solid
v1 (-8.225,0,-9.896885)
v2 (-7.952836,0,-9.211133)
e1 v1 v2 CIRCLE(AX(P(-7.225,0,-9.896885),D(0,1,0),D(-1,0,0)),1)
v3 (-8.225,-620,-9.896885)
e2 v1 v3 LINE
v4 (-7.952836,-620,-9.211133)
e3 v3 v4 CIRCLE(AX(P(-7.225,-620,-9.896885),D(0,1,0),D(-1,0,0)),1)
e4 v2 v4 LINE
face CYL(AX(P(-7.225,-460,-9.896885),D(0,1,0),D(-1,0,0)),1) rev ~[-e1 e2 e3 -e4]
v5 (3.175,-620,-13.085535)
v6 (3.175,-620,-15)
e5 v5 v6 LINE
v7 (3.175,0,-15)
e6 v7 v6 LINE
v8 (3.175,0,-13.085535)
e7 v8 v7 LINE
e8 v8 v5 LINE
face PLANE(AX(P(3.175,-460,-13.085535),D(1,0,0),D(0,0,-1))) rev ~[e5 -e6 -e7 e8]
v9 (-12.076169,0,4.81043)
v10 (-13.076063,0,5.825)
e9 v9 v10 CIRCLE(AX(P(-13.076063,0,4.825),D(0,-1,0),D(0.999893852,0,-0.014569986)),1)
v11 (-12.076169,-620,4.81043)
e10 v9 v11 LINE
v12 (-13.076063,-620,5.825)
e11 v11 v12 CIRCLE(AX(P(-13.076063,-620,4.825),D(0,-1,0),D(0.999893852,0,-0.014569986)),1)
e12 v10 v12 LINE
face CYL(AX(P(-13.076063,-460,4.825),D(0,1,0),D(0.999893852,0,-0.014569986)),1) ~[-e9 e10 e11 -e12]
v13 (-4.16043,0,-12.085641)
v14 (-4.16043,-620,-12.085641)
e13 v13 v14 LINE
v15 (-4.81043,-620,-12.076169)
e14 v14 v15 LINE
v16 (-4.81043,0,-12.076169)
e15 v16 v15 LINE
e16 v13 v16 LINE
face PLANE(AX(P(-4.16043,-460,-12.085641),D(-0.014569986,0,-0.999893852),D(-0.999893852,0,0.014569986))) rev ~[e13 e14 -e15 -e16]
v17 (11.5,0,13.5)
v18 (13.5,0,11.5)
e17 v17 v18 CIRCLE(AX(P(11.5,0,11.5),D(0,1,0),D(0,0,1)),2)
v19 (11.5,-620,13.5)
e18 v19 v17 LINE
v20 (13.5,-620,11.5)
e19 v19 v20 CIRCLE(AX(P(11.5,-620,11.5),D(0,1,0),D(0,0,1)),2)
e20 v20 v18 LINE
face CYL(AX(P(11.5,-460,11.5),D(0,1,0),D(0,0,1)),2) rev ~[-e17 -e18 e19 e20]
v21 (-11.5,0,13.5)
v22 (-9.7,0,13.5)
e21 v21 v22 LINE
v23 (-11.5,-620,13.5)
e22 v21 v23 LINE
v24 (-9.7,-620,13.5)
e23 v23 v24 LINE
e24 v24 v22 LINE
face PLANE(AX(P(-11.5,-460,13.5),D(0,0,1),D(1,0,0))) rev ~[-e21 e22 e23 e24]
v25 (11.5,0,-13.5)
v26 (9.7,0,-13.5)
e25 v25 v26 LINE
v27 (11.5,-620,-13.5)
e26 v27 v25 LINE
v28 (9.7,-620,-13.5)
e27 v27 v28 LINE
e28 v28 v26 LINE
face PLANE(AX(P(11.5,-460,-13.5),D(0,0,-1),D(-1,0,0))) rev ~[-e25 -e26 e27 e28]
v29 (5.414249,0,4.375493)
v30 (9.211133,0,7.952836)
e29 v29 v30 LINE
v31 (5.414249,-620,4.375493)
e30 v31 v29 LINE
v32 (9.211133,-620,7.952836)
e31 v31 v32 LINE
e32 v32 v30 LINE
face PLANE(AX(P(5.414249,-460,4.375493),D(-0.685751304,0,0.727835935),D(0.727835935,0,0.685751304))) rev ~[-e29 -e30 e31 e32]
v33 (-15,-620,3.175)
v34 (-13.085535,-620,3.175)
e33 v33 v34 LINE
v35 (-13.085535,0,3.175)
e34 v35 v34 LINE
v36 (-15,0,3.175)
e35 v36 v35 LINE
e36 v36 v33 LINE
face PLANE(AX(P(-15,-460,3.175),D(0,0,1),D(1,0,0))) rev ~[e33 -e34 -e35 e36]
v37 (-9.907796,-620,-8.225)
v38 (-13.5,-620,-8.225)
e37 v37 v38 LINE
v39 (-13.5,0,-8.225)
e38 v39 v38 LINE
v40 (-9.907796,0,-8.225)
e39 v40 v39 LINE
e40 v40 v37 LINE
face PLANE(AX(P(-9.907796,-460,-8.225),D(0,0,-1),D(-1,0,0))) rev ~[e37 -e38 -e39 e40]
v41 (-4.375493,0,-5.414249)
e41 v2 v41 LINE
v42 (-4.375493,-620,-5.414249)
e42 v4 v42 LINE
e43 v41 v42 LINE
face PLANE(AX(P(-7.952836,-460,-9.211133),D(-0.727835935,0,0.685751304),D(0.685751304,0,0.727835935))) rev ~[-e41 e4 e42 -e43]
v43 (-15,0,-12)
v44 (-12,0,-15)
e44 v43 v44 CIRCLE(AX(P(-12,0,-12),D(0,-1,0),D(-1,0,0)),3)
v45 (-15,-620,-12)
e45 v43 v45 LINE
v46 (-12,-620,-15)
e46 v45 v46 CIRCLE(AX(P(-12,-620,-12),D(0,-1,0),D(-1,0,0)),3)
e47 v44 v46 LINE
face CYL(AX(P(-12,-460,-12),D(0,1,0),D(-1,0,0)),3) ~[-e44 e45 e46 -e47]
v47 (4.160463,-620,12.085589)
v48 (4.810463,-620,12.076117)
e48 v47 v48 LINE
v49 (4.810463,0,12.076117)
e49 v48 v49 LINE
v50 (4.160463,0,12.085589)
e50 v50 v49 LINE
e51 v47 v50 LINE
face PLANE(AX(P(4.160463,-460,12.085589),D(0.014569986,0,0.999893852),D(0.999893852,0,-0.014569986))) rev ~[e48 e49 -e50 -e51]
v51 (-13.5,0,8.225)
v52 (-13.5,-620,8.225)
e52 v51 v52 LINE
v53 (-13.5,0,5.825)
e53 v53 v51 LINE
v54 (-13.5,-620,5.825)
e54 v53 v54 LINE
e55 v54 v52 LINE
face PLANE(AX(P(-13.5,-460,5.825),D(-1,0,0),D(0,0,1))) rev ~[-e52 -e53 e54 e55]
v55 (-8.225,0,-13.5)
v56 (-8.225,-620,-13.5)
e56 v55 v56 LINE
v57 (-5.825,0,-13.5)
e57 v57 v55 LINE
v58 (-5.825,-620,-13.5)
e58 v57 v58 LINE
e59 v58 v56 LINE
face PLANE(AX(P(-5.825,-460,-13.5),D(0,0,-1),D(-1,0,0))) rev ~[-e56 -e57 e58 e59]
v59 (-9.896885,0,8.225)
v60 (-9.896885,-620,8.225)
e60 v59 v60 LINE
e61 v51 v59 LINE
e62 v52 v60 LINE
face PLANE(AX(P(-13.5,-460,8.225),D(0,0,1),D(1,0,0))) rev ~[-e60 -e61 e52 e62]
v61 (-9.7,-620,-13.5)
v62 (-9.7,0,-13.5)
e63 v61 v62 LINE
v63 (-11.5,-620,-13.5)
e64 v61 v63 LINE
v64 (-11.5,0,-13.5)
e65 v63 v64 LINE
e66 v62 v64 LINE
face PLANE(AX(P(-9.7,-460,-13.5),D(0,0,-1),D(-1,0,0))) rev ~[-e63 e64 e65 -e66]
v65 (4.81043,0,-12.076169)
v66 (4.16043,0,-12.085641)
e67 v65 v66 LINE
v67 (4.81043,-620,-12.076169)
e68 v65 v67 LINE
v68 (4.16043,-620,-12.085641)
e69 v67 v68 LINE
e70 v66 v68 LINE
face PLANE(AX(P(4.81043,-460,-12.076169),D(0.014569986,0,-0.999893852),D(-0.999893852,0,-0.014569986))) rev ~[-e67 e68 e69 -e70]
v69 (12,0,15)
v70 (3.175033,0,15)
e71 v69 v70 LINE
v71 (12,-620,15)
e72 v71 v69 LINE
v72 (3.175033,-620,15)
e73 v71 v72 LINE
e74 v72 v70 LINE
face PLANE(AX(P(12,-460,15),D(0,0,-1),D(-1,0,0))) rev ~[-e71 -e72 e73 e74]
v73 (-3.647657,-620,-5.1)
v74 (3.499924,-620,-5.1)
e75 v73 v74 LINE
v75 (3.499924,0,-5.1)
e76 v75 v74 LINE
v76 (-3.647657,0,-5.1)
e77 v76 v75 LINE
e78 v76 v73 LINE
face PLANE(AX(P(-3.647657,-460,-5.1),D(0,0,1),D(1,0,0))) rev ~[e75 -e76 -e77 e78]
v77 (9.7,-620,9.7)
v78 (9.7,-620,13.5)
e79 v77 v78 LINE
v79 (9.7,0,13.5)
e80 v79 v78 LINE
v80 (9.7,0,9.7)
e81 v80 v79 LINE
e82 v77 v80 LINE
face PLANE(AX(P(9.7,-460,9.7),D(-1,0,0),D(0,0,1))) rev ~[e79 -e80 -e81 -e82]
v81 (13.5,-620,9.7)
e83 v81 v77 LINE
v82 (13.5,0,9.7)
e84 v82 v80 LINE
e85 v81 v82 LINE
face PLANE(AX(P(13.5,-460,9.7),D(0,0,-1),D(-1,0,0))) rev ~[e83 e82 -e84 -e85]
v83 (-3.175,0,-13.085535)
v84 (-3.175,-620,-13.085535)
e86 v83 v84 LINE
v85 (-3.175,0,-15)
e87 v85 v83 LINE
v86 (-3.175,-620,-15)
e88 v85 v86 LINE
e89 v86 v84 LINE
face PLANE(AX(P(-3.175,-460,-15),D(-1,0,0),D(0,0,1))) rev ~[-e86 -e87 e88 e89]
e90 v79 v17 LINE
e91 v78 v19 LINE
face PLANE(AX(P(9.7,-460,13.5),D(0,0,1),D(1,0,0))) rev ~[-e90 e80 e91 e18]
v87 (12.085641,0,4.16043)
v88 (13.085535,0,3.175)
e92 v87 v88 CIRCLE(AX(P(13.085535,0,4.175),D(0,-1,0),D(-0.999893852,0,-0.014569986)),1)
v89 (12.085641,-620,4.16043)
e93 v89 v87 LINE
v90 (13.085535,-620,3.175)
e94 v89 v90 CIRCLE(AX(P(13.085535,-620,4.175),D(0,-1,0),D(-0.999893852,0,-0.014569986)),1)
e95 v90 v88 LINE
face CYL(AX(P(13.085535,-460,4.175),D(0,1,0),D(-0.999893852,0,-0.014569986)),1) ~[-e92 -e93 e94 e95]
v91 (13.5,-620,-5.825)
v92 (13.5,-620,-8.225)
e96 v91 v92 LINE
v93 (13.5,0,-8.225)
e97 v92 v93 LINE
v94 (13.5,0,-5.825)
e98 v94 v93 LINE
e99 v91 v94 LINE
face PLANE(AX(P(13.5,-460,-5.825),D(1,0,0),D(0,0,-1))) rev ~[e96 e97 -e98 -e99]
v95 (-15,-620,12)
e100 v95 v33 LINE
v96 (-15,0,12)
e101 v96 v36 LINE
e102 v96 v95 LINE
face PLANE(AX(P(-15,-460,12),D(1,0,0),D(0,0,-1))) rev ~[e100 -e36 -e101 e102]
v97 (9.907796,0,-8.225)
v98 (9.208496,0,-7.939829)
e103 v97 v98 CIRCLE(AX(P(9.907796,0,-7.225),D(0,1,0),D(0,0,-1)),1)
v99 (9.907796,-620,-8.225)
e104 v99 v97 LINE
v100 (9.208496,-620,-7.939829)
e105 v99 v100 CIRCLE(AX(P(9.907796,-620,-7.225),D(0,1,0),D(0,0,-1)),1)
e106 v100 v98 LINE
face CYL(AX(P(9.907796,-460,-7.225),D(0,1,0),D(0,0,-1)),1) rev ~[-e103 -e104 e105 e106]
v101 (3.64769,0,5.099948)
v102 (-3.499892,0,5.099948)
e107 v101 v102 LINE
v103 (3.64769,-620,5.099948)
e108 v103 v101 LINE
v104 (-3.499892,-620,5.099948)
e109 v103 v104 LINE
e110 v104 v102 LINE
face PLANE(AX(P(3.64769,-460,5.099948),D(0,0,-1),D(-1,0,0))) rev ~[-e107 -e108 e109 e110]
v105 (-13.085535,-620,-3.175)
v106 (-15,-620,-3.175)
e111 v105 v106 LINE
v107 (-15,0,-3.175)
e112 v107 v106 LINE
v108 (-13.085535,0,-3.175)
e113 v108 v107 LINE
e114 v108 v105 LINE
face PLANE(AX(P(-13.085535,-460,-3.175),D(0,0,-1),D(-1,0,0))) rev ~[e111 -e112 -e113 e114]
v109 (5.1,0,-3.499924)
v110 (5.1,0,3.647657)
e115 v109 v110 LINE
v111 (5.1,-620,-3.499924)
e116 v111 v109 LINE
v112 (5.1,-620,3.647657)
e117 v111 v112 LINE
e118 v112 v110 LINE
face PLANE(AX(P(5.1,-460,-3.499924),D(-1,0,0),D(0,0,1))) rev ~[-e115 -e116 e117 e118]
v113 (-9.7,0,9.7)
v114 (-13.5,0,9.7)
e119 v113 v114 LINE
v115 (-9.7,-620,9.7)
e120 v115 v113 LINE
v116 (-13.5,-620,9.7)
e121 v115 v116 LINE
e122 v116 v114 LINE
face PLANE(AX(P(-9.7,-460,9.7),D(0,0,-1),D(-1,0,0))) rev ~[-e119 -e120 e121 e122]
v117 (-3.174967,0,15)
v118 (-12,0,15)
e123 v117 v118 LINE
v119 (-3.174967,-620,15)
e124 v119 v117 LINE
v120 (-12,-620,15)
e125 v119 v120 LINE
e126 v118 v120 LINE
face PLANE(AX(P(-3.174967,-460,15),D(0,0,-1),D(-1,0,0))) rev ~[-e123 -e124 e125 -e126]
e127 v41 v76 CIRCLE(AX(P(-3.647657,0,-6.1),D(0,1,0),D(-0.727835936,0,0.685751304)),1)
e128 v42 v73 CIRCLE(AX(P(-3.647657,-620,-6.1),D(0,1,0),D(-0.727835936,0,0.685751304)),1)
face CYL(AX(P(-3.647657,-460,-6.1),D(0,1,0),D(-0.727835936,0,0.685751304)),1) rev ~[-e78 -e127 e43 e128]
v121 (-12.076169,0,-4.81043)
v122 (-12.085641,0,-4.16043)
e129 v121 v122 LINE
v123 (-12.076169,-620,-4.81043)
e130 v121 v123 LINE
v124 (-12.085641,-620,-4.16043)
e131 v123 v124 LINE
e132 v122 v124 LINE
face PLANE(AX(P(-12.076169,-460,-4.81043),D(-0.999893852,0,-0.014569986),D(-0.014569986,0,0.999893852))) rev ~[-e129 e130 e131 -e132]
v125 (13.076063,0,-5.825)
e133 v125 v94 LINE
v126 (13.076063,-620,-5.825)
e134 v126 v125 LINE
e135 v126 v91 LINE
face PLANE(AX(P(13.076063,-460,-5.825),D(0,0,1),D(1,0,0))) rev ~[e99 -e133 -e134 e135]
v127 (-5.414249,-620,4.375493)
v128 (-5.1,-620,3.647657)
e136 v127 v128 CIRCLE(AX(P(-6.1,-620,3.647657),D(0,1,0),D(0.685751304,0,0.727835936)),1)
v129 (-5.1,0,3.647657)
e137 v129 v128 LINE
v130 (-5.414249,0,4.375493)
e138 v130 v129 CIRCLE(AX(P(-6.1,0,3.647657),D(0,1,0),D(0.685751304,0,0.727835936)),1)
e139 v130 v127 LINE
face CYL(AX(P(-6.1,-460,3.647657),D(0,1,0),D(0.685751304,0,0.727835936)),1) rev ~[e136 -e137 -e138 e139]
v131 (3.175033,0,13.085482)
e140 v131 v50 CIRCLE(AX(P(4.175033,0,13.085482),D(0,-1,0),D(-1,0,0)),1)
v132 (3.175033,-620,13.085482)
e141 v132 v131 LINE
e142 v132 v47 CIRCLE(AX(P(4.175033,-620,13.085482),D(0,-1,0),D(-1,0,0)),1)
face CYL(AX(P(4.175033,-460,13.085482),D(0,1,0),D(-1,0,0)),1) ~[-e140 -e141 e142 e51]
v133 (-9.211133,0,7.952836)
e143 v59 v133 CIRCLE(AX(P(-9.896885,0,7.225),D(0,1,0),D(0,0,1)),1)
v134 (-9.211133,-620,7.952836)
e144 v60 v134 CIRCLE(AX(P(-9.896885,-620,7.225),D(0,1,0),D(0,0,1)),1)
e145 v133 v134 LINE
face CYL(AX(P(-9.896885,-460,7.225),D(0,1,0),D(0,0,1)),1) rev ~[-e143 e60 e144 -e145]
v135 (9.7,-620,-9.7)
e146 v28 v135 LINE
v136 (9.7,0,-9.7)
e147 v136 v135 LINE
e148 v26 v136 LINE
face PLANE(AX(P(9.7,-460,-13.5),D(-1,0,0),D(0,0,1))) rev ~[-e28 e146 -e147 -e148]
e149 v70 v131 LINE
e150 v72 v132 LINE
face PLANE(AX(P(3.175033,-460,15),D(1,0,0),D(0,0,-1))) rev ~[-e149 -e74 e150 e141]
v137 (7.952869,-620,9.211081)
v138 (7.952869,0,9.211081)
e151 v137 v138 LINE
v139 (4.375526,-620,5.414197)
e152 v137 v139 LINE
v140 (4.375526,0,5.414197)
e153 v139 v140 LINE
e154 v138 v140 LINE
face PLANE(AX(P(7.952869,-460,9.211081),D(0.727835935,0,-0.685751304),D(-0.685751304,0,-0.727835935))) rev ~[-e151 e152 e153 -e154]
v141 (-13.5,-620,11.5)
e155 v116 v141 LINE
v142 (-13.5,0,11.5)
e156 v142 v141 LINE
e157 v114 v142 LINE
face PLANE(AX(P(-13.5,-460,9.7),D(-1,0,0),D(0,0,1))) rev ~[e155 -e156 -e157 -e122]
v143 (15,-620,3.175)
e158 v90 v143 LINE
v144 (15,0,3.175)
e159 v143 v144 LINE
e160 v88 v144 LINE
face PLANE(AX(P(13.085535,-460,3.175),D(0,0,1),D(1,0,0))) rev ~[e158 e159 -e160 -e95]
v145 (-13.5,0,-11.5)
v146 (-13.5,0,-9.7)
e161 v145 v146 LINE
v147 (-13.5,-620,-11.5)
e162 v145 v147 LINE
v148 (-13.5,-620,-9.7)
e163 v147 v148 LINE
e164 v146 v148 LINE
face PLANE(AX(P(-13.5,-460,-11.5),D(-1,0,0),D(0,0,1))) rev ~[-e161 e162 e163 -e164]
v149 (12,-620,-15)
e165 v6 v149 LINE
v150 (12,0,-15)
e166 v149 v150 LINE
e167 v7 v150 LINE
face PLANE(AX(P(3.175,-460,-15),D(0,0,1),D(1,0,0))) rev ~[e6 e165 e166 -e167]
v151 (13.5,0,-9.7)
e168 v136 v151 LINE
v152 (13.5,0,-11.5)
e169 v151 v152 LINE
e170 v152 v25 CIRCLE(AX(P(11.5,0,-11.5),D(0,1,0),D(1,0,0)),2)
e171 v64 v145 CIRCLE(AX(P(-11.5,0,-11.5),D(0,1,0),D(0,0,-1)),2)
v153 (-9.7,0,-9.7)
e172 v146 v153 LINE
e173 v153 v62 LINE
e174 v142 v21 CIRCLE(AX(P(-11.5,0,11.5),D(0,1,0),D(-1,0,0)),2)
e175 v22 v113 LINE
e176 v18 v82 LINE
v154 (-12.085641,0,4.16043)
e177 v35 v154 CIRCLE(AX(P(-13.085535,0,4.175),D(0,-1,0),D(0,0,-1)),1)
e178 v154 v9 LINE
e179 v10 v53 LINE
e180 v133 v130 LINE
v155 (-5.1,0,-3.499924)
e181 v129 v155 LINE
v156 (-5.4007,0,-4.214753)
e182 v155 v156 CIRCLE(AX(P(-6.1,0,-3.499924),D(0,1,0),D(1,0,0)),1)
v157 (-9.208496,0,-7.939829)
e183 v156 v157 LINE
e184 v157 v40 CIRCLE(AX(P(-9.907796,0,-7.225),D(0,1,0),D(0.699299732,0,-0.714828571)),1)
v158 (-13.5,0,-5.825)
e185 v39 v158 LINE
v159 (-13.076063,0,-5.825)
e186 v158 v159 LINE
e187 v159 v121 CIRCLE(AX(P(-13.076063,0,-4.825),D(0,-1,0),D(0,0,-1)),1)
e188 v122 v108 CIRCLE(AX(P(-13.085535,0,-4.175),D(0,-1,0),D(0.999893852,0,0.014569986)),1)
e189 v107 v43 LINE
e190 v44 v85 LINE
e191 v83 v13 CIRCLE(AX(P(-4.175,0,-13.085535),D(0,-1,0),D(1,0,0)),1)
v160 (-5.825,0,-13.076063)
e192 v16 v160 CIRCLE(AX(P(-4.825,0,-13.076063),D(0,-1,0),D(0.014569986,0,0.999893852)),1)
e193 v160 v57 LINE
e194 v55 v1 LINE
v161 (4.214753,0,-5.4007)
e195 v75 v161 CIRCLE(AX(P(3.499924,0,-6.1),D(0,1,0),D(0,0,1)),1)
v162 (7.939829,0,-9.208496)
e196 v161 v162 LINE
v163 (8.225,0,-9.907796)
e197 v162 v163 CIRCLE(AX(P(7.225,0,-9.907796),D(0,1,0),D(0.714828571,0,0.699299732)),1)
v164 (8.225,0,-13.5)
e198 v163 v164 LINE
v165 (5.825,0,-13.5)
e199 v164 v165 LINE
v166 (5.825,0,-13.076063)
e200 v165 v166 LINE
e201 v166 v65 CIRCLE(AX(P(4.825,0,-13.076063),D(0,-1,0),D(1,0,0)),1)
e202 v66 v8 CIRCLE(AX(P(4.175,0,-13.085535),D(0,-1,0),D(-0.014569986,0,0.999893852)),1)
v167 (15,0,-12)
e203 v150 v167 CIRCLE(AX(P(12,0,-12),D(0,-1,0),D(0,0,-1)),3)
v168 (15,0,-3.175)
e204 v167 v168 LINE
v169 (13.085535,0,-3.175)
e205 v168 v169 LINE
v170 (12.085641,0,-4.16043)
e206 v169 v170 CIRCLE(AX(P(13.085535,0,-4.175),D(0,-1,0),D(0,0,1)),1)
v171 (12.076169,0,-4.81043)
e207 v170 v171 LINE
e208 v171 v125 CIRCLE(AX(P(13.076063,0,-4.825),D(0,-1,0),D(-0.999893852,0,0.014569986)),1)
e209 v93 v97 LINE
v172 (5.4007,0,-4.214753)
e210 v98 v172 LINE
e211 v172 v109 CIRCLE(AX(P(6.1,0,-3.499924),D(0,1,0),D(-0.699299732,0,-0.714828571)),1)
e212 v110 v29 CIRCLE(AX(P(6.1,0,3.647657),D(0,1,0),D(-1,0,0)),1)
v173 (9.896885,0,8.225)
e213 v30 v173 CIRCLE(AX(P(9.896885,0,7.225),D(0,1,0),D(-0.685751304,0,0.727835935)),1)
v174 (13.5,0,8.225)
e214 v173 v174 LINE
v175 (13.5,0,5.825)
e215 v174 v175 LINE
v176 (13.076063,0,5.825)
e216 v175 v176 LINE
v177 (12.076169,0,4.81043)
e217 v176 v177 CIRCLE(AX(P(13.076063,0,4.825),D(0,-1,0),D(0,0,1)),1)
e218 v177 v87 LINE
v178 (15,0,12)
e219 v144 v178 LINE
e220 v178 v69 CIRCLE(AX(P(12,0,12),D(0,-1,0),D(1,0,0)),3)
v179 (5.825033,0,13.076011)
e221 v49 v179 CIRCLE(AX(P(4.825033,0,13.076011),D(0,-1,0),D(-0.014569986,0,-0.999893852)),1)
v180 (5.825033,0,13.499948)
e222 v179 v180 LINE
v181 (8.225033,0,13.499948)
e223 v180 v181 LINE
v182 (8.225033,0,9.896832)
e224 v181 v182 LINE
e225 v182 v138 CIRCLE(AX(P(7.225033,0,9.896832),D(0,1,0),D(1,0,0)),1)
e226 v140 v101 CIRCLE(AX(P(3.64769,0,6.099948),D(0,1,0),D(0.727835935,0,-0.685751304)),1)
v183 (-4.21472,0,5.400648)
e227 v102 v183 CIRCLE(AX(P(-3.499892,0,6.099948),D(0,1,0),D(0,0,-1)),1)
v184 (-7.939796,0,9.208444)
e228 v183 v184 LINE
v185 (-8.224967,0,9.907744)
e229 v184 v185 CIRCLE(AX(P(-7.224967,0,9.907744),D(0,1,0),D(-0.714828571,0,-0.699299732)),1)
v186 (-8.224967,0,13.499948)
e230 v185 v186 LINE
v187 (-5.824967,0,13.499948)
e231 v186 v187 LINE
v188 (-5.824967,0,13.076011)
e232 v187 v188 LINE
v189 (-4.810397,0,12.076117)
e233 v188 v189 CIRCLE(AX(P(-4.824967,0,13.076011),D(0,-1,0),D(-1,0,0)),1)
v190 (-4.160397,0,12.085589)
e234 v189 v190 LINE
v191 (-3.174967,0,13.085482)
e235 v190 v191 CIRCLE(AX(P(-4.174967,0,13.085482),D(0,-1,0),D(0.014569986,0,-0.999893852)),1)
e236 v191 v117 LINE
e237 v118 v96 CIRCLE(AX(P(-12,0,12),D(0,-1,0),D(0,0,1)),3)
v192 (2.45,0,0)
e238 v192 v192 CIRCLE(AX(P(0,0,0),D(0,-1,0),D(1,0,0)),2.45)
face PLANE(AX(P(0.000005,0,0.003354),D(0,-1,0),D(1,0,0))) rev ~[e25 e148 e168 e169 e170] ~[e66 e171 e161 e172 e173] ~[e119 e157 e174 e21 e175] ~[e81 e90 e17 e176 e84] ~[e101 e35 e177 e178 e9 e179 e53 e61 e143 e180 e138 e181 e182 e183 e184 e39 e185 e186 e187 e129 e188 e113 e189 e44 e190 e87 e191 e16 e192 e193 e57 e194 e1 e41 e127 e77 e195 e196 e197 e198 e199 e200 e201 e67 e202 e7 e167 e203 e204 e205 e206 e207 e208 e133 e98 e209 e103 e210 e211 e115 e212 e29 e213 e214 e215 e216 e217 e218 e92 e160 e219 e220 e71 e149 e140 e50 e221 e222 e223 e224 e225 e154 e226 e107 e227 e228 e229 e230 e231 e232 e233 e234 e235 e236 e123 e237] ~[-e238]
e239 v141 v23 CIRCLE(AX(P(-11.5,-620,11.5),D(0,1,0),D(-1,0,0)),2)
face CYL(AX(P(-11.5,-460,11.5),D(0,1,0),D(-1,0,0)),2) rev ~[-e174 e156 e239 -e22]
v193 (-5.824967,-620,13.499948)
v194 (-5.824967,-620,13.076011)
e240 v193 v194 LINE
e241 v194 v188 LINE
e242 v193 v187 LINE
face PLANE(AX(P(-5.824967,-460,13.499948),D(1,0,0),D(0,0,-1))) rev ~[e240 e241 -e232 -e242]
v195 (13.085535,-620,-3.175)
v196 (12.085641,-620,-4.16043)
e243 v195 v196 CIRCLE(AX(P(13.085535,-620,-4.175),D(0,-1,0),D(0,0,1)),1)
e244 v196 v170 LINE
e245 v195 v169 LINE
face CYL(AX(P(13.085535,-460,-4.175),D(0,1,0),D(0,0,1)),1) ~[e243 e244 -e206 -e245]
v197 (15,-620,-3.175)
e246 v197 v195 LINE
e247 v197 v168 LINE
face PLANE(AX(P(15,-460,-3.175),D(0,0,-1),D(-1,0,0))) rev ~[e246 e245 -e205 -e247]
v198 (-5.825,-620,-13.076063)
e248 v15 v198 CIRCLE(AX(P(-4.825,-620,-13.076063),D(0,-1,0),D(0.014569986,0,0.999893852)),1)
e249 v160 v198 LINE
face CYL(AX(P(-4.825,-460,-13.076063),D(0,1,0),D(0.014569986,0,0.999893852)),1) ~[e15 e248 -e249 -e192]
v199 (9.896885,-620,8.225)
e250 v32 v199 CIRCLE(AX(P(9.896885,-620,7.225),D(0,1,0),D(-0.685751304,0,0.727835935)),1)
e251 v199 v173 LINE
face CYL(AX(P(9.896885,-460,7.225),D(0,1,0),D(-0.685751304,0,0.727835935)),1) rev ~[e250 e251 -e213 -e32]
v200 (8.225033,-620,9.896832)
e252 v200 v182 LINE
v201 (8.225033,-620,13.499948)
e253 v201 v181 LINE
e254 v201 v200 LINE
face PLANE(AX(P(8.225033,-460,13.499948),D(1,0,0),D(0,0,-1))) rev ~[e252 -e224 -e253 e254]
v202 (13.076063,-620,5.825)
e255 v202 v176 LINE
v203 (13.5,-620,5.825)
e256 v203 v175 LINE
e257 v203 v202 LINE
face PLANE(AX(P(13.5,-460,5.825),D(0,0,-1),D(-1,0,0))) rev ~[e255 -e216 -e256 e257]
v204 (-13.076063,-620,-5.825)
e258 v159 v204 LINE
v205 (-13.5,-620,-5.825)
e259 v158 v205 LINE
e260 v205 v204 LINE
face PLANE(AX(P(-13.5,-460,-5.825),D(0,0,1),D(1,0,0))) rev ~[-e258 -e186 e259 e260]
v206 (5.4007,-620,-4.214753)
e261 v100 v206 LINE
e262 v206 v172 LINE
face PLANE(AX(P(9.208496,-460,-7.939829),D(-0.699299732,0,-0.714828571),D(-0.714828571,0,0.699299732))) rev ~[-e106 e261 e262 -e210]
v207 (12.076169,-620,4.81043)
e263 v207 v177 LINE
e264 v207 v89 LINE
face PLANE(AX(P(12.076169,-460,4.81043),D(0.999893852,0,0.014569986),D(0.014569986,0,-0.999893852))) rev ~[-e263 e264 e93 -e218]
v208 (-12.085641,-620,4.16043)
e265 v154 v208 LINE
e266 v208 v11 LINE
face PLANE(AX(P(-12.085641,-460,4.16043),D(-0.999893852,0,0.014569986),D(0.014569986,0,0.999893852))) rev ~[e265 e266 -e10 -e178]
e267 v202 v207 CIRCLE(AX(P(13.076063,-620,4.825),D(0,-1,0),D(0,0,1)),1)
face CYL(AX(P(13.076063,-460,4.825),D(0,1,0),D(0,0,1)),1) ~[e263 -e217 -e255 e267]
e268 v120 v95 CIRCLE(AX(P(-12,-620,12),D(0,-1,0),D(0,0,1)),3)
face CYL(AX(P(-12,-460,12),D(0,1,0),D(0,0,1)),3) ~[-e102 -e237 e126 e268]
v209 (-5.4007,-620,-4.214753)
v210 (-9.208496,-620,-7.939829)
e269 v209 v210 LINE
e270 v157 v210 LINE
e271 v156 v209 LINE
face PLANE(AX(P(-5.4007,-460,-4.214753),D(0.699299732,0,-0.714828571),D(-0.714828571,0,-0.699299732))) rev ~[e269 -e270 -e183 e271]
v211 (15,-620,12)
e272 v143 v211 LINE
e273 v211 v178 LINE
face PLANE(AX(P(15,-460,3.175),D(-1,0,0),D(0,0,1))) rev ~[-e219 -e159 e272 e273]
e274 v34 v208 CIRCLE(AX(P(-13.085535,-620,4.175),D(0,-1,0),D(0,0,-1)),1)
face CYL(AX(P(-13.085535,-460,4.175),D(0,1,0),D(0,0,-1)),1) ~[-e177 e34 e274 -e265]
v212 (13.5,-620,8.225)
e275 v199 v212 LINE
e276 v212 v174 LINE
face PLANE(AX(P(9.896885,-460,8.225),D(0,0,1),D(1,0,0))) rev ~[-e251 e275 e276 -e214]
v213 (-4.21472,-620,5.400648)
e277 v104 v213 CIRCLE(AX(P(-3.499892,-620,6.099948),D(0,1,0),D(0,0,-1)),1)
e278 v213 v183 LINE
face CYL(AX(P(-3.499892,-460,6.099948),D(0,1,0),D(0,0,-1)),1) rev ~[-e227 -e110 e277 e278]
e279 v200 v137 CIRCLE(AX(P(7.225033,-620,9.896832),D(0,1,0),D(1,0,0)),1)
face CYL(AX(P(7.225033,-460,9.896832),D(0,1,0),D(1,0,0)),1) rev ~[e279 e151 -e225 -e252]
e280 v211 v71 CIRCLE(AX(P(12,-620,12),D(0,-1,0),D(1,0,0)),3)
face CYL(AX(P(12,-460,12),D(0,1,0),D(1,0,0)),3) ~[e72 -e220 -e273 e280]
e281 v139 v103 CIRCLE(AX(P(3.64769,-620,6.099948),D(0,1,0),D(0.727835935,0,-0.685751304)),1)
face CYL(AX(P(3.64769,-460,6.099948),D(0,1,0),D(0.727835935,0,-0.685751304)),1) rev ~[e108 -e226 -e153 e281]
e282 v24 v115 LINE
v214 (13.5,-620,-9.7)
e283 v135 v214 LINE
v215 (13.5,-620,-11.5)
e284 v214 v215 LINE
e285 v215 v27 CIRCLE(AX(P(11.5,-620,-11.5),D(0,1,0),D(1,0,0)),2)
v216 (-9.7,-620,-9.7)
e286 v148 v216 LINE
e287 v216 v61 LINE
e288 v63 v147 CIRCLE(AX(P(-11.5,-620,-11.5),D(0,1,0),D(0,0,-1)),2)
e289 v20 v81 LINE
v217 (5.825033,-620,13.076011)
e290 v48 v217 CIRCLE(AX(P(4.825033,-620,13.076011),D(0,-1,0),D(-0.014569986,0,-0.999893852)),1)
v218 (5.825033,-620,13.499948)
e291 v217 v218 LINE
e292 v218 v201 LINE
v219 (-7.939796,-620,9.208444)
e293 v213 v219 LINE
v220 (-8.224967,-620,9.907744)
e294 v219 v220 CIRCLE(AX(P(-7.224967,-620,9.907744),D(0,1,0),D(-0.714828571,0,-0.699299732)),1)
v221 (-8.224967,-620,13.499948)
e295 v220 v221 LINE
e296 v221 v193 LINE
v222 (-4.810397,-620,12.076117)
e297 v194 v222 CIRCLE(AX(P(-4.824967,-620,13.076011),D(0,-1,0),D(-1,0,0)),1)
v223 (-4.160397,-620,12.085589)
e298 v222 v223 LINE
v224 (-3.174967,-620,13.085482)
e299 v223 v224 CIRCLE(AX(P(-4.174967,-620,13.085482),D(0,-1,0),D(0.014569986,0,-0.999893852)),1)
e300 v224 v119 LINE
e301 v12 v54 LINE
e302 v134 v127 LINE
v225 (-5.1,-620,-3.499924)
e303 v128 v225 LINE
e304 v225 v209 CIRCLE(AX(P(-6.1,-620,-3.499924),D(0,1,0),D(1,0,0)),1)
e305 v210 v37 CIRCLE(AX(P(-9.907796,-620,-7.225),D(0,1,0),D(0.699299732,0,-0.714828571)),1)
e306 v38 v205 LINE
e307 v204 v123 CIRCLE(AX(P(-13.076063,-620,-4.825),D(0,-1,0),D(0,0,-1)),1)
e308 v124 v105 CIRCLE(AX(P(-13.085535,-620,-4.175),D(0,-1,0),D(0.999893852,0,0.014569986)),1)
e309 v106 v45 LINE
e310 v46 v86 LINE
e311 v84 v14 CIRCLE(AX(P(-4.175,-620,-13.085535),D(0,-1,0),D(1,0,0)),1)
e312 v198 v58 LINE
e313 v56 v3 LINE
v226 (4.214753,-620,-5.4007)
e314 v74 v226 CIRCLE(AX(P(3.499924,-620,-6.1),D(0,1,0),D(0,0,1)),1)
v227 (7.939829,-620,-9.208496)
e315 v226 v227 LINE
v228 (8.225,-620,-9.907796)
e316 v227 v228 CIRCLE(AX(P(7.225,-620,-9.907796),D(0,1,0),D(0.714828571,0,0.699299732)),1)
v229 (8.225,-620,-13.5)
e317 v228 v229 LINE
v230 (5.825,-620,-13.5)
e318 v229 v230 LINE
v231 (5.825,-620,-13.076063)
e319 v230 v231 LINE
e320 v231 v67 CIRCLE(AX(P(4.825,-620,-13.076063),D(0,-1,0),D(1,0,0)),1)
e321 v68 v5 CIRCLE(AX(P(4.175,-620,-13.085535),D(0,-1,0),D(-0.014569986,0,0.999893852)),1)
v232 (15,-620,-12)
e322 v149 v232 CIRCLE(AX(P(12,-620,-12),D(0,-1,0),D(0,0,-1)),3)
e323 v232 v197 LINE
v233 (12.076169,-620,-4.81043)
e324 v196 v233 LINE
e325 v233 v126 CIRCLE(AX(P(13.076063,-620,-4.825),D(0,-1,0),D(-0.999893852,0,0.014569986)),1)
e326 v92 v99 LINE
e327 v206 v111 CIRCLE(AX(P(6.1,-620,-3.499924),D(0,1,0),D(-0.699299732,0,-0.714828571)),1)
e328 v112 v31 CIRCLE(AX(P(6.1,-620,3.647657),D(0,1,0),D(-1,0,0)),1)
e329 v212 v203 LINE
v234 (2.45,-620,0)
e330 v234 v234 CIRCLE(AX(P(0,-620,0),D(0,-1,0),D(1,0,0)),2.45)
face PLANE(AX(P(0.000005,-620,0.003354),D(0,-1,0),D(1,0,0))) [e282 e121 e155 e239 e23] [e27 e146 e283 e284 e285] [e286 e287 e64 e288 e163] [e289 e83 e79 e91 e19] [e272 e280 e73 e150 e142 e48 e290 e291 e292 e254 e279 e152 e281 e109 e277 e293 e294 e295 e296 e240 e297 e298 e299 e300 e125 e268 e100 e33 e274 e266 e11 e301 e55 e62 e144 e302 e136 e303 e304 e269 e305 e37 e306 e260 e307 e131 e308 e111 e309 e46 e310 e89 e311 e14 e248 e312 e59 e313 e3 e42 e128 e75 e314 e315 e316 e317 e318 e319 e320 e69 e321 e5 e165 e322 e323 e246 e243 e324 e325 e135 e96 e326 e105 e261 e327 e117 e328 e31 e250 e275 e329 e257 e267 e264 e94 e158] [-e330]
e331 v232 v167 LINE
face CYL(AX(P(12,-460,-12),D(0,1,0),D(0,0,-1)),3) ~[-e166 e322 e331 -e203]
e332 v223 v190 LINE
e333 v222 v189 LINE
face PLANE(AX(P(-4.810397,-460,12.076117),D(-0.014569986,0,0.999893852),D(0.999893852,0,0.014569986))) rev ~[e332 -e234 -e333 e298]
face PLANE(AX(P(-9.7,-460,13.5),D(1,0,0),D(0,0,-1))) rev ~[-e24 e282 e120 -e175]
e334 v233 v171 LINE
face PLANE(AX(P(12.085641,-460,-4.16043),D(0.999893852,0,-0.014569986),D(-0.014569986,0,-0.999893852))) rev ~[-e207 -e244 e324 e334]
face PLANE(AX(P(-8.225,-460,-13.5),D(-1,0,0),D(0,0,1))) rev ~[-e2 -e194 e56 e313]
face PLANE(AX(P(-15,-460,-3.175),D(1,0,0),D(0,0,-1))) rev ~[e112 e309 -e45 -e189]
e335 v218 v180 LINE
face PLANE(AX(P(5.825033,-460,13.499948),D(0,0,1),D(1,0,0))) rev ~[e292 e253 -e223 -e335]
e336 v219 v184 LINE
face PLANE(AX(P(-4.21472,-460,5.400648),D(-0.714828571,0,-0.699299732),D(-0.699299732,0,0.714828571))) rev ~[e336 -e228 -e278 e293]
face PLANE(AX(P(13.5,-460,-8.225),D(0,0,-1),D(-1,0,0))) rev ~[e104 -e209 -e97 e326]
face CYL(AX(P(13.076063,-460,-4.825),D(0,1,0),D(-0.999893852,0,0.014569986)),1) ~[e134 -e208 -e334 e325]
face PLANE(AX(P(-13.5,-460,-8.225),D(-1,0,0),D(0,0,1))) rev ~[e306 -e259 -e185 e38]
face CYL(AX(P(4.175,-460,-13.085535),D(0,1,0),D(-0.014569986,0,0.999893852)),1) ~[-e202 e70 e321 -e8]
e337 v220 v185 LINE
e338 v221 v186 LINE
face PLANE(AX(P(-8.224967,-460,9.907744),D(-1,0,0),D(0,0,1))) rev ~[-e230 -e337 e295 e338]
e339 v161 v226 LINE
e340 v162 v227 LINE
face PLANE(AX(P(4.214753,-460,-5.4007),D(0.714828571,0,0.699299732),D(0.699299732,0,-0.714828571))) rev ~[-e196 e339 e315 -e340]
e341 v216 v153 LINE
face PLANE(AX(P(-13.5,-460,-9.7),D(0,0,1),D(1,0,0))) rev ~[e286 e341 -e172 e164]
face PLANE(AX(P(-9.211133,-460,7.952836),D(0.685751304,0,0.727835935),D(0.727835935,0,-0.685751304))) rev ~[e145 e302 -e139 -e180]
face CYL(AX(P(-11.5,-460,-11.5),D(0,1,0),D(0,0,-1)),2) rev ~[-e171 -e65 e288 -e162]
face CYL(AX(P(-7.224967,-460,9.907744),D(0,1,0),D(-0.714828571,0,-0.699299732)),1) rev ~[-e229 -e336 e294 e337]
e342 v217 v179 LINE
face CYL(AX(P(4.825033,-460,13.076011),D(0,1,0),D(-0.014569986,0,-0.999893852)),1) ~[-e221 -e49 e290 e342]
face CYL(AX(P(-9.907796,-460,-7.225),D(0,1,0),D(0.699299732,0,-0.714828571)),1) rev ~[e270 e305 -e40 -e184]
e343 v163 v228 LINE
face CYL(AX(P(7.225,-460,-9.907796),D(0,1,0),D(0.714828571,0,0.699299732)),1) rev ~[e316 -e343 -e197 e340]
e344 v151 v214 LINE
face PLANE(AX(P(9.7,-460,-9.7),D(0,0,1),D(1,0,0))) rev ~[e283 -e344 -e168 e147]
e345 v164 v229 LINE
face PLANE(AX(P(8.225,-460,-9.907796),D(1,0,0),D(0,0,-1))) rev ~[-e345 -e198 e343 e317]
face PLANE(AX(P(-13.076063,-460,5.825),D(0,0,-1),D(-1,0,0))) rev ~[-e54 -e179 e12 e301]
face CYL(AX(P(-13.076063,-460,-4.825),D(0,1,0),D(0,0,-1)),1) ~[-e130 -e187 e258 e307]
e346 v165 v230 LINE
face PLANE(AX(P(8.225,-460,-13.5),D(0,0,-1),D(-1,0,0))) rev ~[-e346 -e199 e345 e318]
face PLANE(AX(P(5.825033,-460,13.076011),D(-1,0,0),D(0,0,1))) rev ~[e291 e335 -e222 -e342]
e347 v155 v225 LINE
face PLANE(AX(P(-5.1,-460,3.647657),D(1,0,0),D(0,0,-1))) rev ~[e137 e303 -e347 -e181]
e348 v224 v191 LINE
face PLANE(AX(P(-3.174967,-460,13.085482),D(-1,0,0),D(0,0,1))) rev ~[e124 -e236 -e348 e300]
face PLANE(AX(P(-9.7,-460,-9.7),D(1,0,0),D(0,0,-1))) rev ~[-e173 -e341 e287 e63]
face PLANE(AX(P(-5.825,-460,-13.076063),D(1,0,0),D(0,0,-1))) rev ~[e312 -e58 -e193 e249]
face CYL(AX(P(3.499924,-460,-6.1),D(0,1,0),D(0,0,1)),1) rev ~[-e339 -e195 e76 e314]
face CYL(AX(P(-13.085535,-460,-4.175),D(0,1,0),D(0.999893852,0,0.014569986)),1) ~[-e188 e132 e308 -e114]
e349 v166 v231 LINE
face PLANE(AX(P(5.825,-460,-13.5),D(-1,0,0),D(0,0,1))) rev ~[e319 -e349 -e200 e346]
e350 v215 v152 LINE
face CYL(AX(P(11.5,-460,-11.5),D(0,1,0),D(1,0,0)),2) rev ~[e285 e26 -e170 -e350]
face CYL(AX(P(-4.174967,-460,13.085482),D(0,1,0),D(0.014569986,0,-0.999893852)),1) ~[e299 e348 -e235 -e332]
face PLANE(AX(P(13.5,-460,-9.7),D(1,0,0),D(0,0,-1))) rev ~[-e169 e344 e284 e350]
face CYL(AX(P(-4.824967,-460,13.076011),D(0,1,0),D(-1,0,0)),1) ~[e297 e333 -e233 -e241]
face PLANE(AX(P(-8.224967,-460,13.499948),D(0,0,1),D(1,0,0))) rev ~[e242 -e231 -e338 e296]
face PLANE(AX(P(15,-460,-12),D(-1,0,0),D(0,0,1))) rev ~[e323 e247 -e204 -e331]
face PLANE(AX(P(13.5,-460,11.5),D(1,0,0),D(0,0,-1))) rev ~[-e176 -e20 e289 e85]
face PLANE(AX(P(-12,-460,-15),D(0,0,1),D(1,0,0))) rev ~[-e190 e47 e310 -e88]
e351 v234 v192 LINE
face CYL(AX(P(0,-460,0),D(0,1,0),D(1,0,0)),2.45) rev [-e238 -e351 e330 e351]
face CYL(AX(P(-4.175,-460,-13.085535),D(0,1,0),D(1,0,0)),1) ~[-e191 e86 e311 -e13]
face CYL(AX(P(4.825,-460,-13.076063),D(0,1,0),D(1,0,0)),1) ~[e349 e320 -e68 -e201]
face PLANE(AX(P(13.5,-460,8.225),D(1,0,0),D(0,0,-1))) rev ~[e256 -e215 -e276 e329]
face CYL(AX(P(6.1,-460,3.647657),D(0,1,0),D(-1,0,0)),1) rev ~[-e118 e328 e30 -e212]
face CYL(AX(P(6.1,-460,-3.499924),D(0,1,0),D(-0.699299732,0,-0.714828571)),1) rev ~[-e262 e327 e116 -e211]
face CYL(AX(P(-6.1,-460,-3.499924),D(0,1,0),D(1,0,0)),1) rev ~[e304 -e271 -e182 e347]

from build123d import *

# Parameters (mm, degrees)
F0_R     = 2.45
F1_DEPTH = 460
F2_DEPTH = 160


# Not quite as in the source:
# - ends of sketch curves that miss each other by under 0.0002 mm in the source are joined


with BuildPart() as f1:
    # F0 (on Front) → F1 (new body)
    with BuildSketch(Plane.XZ):
        with BuildLine():
            Line((-3.1749674082, 15), (-12, 15))
            ThreePointArc((-12, 15), (-14.1213203436, 14.1213203436), (-15, 12))
            Line((-15, 12), (-15, 3.175))
            Line((-15, 3.175), (-13.0855346263, 3.175))
            ThreePointArc((-13.0855346263, 3.175), (-12.3835980145, 3.4627605788), (-12.0856407741, 4.1604300138))
            Line((-12.0856407741, 4.1604300138), (-12.0761692778, 4.8104300138))
            ThreePointArc((-12.0761692778, 4.8104300138), (-12.3638237087, 5.5269366118), (-13.0760631299, 5.825))
            Line((-13.0760631299, 5.825), (-13.5, 5.825))
            Line((-13.5, 5.825), (-13.5, 8.225))
            Line((-13.5, 8.225), (-9.8968845016, 8.225))
            ThreePointArc((-9.8968845016, 8.225), (-9.5279915195, 8.1544718757), (-9.2111331975, 7.9528359354))
            Line((-9.2111331975, 7.9528359354), (-5.4142486959, 4.3754933338))
            ThreePointArc((-5.4142486959, 4.3754933338), (-5.1819174045, 4.0440465354), (-5.1, 3.6476573984))
            Line((-5.1, 3.6476573984), (-5.1, -3.4999243287))
            ThreePointArc((-5.1, -3.4999243287), (-5.1782354607, -3.8876744211), (-5.4007002683, -4.2147528992))
            Line((-5.4007002683, -4.2147528992), (-9.2084959767, -7.9398285705))
            ThreePointArc((-9.2084959767, -7.9398285705), (-9.5301904718, -8.1509666761), (-9.9077957084, -8.225))
            Line((-9.9077957084, -8.225), (-13.5, -8.225))
            Line((-13.5, -8.225), (-13.5, -5.825))
            Line((-13.5, -5.825), (-13.0760631299, -5.825))
            ThreePointArc((-13.0760631299, -5.825), (-12.3638237087, -5.5269366118), (-12.0761692778, -4.8104300138))
            Line((-12.0761692778, -4.8104300138), (-12.0856407741, -4.1604300138))
            ThreePointArc((-12.0856407741, -4.1604300138), (-12.3835980145, -3.4627605788), (-13.0855346263, -3.175))
            Line((-13.0855346263, -3.175), (-15, -3.175))
            Line((-15, -3.175), (-15, -12))
            ThreePointArc((-15, -12), (-14.1213203436, -14.1213203436), (-12, -15))
            Line((-12, -15), (-3.175, -15))
            Line((-3.175, -15), (-3.175, -13.0855346263))
            ThreePointArc((-3.175, -13.0855346263), (-3.4627605788, -12.3835980145), (-4.1604300138, -12.0856407741))
            Line((-4.1604300138, -12.0856407741), (-4.8104300138, -12.0761692778))
            ThreePointArc((-4.8104300138, -12.0761692778), (-5.5269366118, -12.3638237087), (-5.825, -13.0760631299))
            Line((-5.825, -13.0760631299), (-5.825, -13.5))
            Line((-5.825, -13.5), (-8.225, -13.5))
            Line((-8.225, -13.5), (-8.225, -9.8968845016))
            ThreePointArc((-8.225, -9.8968845016), (-8.1544718757, -9.5279915195), (-7.9528359354, -9.2111331975))
            Line((-7.9528359354, -9.2111331975), (-4.3754933338, -5.4142486959))
            ThreePointArc((-4.3754933338, -5.4142486959), (-4.0440465354, -5.1819174045), (-3.6476573984, -5.1))
            Line((-3.6476573984, -5.1), (3.4999243287, -5.1))
            ThreePointArc((3.4999243287, -5.1), (3.8876744211, -5.1782354607), (4.2147528992, -5.4007002683))
            Line((4.2147528992, -5.4007002683), (7.9398285705, -9.2084959767))
            ThreePointArc((7.9398285705, -9.2084959767), (8.1509666761, -9.5301904718), (8.225, -9.9077957084))
            Line((8.225, -9.9077957084), (8.225, -13.5))
            Line((8.225, -13.5), (5.825, -13.5))
            Line((5.825, -13.5), (5.825, -13.0760631299))
            ThreePointArc((5.825, -13.0760631299), (5.5269366118, -12.3638237087), (4.8104300138, -12.0761692778))
            Line((4.8104300138, -12.0761692778), (4.1604300138, -12.0856407741))
            ThreePointArc((4.1604300138, -12.0856407741), (3.4627605788, -12.3835980145), (3.175, -13.0855346263))
            Line((3.175, -13.0855346263), (3.175, -15))
            Line((3.175, -15), (12, -15))
            ThreePointArc((12, -15), (14.1213203436, -14.1213203436), (15, -12))
            Line((15, -12), (15, -3.175))
            Line((15, -3.175), (13.0855346263, -3.175))
            ThreePointArc((13.0855346263, -3.175), (12.3835980145, -3.4627605788), (12.0856407741, -4.1604300138))
            Line((12.0856407741, -4.1604300138), (12.0761692778, -4.8104300138))
            ThreePointArc((12.0761692778, -4.8104300138), (12.3638237087, -5.5269366118), (13.0760631299, -5.825))
            Line((13.0760631299, -5.825), (13.5, -5.825))
            Line((13.5, -5.825), (13.5, -8.225))
            Line((13.5, -8.225), (9.9077957084, -8.225))
            ThreePointArc((9.9077957084, -8.225), (9.5301904718, -8.1509666761), (9.2084959767, -7.9398285705))
            Line((9.2084959767, -7.9398285705), (5.4007002683, -4.2147528992))
            ThreePointArc((5.4007002683, -4.2147528992), (5.1782354607, -3.8876744211), (5.1, -3.4999243287))
            Line((5.1, -3.4999243287), (5.1, 3.6476573984))
            ThreePointArc((5.1, 3.6476573984), (5.1819174045, 4.0440465354), (5.4142486959, 4.3754933338))
            Line((5.4142486959, 4.3754933338), (9.2111331975, 7.9528359354))
            ThreePointArc((9.2111331975, 7.9528359354), (9.5279915195, 8.1544718757), (9.8968845016, 8.225))
            Line((9.8968845016, 8.225), (13.5, 8.225))
            Line((13.5, 8.225), (13.5, 5.825))
            Line((13.5, 5.825), (13.0760631299, 5.825))
            ThreePointArc((13.0760631299, 5.825), (12.3638237087, 5.5269366118), (12.0761692778, 4.8104300138))
            Line((12.0761692778, 4.8104300138), (12.0856407741, 4.1604300138))
            ThreePointArc((12.0856407741, 4.1604300138), (12.3835980145, 3.4627605788), (13.0855346263, 3.175))
            Line((13.0855346263, 3.175), (15, 3.175))
            Line((15, 3.175), (15, 12))
            ThreePointArc((15, 12), (14.1213203436, 14.1213203436), (12, 15))
            Line((12, 15), (3.1750325918, 15))
            Line((3.1750325918, 15), (3.1750325918, 13.0854824722))
            ThreePointArc((3.1750325918, 13.0854824722), (3.4627931706, 12.3835458604), (4.1604626057, 12.0855886201))
            Line((4.1604626057, 12.0855886201), (4.8104626057, 12.0761171237))
            ThreePointArc((4.8104626057, 12.0761171237), (5.5269692036, 12.3637715546), (5.8250325918, 13.0760109758))
            Line((5.8250325918, 13.0760109758), (5.8250325918, 13.4999478459))
            Line((5.8250325918, 13.4999478459), (8.2250325918, 13.4999478459))
            Line((8.2250325918, 13.4999478459), (8.2250325918, 9.8968323476))
            ThreePointArc((8.2250325918, 9.8968323476), (8.1545044675, 9.5279393654), (7.9528685272, 9.2110810434))
            Line((7.9528685272, 9.2110810434), (4.3755259256, 5.4141965418))
            ThreePointArc((4.3755259256, 5.4141965418), (4.0440791272, 5.1818652505), (3.6476899902, 5.0999478459))
            Line((3.6476899902, 5.0999478459), (-3.4998917369, 5.0999478459))
            ThreePointArc((-3.4998917369, 5.0999478459), (-3.8876418293, 5.1781833067), (-4.2147203074, 5.4006481142))
            Line((-4.2147203074, 5.4006481142), (-7.9397959787, 9.2084438226))
            ThreePointArc((-7.9397959787, 9.2084438226), (-8.1509340843, 9.5301383177), (-8.2249674082, 9.9077435543))
            Line((-8.2249674082, 9.9077435543), (-8.2249674082, 13.4999478459))
            Line((-8.2249674082, 13.4999478459), (-5.8249674082, 13.4999478459))
            Line((-5.8249674082, 13.4999478459), (-5.8249674082, 13.0760109758))
            ThreePointArc((-5.8249674082, 13.0760109758), (-5.5269040199, 12.3637715546), (-4.810397422, 12.0761171237))
            Line((-4.810397422, 12.0761171237), (-4.160397422, 12.0855886201))
            ThreePointArc((-4.160397422, 12.0855886201), (-3.462727987, 12.3835458604), (-3.1749674082, 13.0854824722))
            Line((-3.1749674082, 13.0854824722), (-3.1749674082, 15))
        make_face()
        with BuildLine():
            Line((-13.5, -11.5), (-13.5, -9.7))
            Line((-13.5, -9.7), (-9.7, -9.7))
            Line((-9.7, -9.7), (-9.7, -13.5))
            Line((-9.7, -13.5), (-11.5, -13.5))
            ThreePointArc((-11.5, -13.5), (-12.9142135624, -12.9142135624), (-13.5, -11.5))
        make_face(mode=Mode.SUBTRACT)
        with BuildLine():
            Line((9.7, -9.7), (13.5, -9.7))
            Line((13.5, -9.7), (13.5, -11.5))
            ThreePointArc((13.5, -11.5), (12.9142135624, -12.9142135624), (11.5, -13.5))
            Line((11.5, -13.5), (9.7, -13.5))
            Line((9.7, -13.5), (9.7, -9.7))
        make_face(mode=Mode.SUBTRACT)
        with BuildLine():
            ThreePointArc((-13.5, 11.5), (-12.9142135624, 12.9142135624), (-11.5, 13.5))
            Line((-11.5, 13.5), (-9.7, 13.5))
            Line((-9.7, 13.5), (-9.7, 9.7))
            Line((-9.7, 9.7), (-13.5, 9.7))
            Line((-13.5, 9.7), (-13.5, 11.5))
        make_face(mode=Mode.SUBTRACT)
        Circle(F0_R, mode=Mode.SUBTRACT)
        with BuildLine():
            Line((9.7, 13.5), (11.5, 13.5))
            ThreePointArc((11.5, 13.5), (12.9142135624, 12.9142135624), (13.5, 11.5))
            Line((13.5, 11.5), (13.5, 9.7))
            Line((13.5, 9.7), (9.7, 9.7))
            Line((9.7, 9.7), (9.7, 13.5))
        make_face(mode=Mode.SUBTRACT)
    extrude(amount=F1_DEPTH)

    # F2 (add): a face of the model
    f2_faces = [f1.faces().sort_by_distance(p)[0] for p in [
        (5.2291627207, -460, 12.6659491494),
    ]]
    extrude(f2_faces, amount=F2_DEPTH)


solid = f1.part
